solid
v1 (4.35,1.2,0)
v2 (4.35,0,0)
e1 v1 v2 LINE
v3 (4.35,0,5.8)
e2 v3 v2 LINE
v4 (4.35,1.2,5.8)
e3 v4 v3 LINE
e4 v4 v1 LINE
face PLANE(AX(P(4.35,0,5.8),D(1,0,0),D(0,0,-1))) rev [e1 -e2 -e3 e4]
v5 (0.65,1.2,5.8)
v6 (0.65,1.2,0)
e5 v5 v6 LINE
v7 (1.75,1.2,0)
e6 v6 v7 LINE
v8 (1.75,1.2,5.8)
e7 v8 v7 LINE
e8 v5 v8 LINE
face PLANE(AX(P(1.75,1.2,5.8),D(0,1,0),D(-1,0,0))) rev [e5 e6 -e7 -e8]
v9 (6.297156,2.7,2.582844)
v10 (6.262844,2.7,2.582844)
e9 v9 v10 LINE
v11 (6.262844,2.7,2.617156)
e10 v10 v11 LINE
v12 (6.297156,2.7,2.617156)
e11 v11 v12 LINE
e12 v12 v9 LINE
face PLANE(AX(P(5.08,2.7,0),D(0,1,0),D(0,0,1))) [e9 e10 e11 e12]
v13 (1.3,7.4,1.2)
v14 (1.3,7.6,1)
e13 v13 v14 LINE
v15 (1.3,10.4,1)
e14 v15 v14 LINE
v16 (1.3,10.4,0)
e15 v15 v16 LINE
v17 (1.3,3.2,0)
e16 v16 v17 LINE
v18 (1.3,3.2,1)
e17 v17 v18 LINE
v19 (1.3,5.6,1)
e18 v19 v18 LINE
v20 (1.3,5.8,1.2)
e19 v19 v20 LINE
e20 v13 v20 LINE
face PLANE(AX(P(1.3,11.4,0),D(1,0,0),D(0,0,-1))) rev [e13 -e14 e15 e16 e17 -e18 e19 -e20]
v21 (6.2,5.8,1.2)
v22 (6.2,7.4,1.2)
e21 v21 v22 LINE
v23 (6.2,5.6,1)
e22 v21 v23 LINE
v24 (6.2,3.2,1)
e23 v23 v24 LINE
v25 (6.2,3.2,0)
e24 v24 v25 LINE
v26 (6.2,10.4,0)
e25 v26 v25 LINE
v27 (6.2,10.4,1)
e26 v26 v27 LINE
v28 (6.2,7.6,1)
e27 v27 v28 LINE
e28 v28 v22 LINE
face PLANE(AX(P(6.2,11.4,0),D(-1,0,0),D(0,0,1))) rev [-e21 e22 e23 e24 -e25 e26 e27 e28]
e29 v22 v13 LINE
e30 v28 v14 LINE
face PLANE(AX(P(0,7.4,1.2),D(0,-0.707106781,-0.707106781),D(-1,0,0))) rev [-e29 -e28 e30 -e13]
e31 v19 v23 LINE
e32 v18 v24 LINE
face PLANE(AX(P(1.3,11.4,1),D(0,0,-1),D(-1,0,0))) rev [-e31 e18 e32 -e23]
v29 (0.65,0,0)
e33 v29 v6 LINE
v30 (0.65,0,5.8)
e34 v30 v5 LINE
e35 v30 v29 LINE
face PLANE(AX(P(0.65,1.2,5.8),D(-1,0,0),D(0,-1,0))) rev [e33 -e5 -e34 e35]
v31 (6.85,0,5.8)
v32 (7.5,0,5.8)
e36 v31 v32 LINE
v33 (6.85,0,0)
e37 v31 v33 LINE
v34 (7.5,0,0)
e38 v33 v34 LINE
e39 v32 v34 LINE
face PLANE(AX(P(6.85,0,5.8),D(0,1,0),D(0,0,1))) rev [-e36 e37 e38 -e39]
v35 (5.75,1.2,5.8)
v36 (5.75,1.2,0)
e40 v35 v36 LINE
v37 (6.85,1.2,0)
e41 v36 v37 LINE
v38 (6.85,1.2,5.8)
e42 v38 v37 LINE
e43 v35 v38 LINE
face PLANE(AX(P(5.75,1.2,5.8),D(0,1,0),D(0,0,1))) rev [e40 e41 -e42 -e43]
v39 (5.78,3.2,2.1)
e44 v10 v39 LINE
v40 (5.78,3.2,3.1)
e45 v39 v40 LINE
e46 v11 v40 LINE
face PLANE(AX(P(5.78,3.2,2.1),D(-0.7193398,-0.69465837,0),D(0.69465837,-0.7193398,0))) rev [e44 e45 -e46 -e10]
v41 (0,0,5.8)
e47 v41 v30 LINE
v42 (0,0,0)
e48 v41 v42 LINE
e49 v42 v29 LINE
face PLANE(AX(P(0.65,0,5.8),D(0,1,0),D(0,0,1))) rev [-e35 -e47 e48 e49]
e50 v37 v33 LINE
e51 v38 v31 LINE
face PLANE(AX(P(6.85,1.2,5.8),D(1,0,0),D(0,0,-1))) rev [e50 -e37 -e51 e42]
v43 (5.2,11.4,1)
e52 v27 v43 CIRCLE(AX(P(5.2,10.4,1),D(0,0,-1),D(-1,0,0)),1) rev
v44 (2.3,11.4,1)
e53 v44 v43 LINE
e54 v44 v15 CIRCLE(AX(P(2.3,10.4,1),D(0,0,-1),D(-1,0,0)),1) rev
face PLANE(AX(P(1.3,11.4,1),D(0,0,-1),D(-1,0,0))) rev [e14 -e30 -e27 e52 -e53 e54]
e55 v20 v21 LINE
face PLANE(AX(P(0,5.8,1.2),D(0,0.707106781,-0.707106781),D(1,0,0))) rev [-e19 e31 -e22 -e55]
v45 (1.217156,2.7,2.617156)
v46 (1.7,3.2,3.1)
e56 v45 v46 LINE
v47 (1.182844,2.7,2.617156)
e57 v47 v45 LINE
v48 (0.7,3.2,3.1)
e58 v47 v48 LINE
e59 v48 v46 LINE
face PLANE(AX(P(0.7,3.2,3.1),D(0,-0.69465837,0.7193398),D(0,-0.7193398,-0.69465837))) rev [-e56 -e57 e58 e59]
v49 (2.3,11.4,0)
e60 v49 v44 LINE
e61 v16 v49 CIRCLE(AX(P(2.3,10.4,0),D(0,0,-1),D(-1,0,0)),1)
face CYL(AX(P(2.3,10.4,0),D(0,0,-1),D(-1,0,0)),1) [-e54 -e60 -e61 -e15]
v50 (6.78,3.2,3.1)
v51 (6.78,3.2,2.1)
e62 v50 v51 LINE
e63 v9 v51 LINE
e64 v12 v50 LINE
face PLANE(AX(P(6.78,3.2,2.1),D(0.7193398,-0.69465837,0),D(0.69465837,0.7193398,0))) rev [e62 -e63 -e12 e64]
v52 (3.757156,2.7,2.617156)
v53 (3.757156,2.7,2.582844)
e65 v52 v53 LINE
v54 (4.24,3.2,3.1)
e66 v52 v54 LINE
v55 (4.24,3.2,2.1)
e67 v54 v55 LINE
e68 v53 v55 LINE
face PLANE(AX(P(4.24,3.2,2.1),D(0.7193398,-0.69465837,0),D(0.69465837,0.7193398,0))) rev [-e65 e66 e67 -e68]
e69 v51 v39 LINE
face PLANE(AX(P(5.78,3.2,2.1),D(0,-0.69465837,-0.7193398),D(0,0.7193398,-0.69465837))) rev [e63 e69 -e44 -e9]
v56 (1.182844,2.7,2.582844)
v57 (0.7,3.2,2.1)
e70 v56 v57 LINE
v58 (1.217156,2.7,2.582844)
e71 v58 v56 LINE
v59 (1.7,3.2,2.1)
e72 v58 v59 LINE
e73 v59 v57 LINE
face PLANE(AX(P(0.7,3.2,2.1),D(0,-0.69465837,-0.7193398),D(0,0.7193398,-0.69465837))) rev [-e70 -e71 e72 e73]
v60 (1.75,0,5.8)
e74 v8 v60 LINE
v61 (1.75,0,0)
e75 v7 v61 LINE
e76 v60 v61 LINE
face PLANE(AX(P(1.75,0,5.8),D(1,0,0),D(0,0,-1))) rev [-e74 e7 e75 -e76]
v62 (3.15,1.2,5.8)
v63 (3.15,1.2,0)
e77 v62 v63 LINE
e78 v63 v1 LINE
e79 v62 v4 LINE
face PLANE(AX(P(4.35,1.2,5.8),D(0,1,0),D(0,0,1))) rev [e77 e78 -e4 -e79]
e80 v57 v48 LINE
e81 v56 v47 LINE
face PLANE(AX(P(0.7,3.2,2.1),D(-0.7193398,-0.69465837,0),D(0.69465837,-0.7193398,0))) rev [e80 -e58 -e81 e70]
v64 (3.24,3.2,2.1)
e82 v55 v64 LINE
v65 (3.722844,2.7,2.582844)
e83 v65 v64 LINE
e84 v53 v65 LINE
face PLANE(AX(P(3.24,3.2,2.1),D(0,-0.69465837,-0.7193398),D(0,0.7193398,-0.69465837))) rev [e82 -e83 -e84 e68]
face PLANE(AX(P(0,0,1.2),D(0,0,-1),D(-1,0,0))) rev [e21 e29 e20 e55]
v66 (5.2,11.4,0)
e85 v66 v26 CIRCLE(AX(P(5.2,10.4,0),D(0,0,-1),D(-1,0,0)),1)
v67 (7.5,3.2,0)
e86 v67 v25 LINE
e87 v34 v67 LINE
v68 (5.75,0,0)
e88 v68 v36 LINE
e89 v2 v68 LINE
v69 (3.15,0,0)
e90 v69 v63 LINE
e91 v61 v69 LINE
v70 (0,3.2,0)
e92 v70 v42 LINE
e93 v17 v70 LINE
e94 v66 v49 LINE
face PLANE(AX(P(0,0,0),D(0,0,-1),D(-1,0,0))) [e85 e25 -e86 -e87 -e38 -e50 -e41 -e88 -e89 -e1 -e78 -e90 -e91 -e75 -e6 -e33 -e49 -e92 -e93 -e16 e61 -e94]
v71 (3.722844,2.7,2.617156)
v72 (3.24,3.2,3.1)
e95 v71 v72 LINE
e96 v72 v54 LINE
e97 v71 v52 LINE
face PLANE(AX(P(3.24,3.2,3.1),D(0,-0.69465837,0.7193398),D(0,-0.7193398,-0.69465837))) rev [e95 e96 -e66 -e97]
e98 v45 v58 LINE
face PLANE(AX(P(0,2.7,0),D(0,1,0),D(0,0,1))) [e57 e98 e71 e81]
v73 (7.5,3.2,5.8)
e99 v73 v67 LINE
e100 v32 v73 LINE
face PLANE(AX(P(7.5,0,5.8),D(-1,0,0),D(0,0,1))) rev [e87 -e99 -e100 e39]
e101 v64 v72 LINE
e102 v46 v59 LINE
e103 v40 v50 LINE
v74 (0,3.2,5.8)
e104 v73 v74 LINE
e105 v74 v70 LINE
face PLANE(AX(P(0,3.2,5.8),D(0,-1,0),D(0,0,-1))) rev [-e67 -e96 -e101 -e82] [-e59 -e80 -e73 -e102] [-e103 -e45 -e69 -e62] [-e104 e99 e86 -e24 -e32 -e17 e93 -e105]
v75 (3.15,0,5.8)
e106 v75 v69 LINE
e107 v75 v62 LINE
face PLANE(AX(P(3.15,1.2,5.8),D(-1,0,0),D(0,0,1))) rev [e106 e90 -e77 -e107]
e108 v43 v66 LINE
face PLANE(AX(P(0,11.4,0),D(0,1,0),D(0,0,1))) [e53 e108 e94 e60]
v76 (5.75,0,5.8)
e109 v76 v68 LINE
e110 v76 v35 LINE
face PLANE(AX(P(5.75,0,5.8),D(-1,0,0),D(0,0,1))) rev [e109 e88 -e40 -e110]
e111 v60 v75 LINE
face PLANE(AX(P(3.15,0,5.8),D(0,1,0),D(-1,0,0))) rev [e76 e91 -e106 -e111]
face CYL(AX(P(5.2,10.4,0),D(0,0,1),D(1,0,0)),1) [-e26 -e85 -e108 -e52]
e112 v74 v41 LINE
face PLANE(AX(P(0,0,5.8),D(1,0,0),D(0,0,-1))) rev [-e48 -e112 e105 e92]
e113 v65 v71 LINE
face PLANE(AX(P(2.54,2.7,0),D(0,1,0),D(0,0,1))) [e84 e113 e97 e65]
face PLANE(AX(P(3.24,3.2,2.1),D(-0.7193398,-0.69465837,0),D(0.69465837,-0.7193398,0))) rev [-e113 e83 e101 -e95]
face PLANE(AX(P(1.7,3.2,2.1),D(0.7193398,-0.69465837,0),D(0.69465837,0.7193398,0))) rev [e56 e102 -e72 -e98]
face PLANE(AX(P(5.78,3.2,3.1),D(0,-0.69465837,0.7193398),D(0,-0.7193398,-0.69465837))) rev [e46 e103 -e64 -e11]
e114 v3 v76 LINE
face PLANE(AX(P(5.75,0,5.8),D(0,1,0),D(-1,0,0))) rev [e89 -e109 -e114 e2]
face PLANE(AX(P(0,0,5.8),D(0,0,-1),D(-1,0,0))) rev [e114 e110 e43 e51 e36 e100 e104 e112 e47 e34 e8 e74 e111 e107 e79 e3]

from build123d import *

# Parameters (mm, degrees)
EXTRUDE_1_DEPTH                  = 5.8
SKETCH_2_W                       = 4.9
SKETCH_2_H                       = 1
EXTRUDE_2_DEPTH                  = 8.2
SKETCH_3_W                       = 4.9
SKETCH_3_H                       = 2
EXTRUDE_3_DEPTH                  = 0.2
CHAMFER_1_SIZE                   = 0.2
FILLET_1_R                       = 1
SKETCH_4_W                       = 1
SKETCH_4_H                       = 1
CUT_EXTRUDE_1_DEPTH              = 0.5
CUT_EXTRUDE_1_DRAFT              = -44
PATTERN_LINEAR_1_COPY_1_SKETCH_W = 1
PATTERN_LINEAR_1_COPY_1_SKETCH_H = 1
PATTERN_LINEAR_1_COPY_1_DEPTH    = 0.5
PATTERN_LINEAR_1_COPY_1_DRAFT    = -44
PATTERN_LINEAR_1_COPY_2_SKETCH_W = 1
PATTERN_LINEAR_1_COPY_2_SKETCH_H = 1
PATTERN_LINEAR_1_COPY_2_DEPTH    = 0.5
PATTERN_LINEAR_1_COPY_2_DRAFT    = -44


with BuildPart() as part:
    # Эскиз1 → Бобышка-Вытянуть1 (new body)
    with BuildSketch(Plane.XY):
        Polygon((0, 0), (0, 3.2), (7.5, 3.2), (7.5, 0), (6.85, 0), (6.85, 1.2), (5.75, 1.2), (5.75, 0), (4.35, 0), (4.35, 1.2), (3.15, 1.2), (3.15, 0), (1.75, 0), (1.75, 1.2), (0.65, 1.2), (0.65, 0), align=None)
    extrude(amount=EXTRUDE_1_DEPTH)

    # Эскиз2 → Бобышка-Вытянуть2 (add)
    with BuildSketch(Plane(origin=(0, 3.2, 0), x_dir=(1, 0, 0), z_dir=(0, 1, 0))):
        with Locations((3.75, -0.5)):
            Rectangle(SKETCH_2_W, SKETCH_2_H)
    extrude(amount=EXTRUDE_2_DEPTH)

    # Эскиз3 → Бобышка-Вытянуть3 (add)
    with BuildSketch(Plane.XY.offset(1)):
        with Locations((3.75, 6.6)):
            Rectangle(SKETCH_3_W, SKETCH_3_H)
    extrude(amount=EXTRUDE_3_DEPTH)

    # Фаска1
    chamfer_1_edges = [part.edges().sort_by_distance(p)[0] for p in [
        (3.75, 5.6, 1.2),
        (3.75, 7.6, 1.2),
    ]]
    chamfer(chamfer_1_edges, length=CHAMFER_1_SIZE - 0.0001)  # a hair under: the kernel refuses the full size

    # Скругление1
    fillet_1_edges = [part.edges().sort_by_distance(p)[0] for p in [
        (1.3, 11.4, 0.5),
        (6.2, 11.4, 0.5),
    ]]
    fillet(fillet_1_edges, radius=FILLET_1_R)


with BuildPart() as cut_extrude_1_tool:
    # Эскиз4 → Вырез-Вытянуть1 (with draft: the straight prism first)
    with BuildSketch(Plane(origin=(0, 3.2, 0), x_dir=(1, 0, 0), z_dir=(0, 1, 0))):
        with Locations((1.2, -2.6)):
            Rectangle(SKETCH_4_W, SKETCH_4_H)
    extrude(amount=-CUT_EXTRUDE_1_DEPTH)
    # Вырез-Вытянуть1: the draft: its side faces are tilted about the plane it starts from
    cut_extrude_1_sides = [cut_extrude_1_tool.faces().sort_by_distance(p)[0] for p in [
        (0.7, 2.95, 2.6),
        (1.2, 2.95, 3.1),
        (1.7, 2.95, 2.6),
        (1.2, 2.95, 2.1),
    ]]
    draft(cut_extrude_1_sides, Plane(origin=(0, 3.2, 0), x_dir=(1, 0, 0), z_dir=(0, 1, 0)), CUT_EXTRUDE_1_DRAFT)


with BuildPart() as part_1:
    add(part.part)

    # Вырез-Вытянуть1: cut by cut_extrude_1_tool
    add(cut_extrude_1_tool.part, mode=Mode.SUBTRACT)


with BuildPart() as pattern_linear_1_copy_1_tool:
    # Линейный массив1 copy 1 sketch → Линейный массив1 copy 1 (with draft: the straight prism first)
    with BuildSketch(Plane(origin=(2.54, 3.2, 0), x_dir=(1, 0, 0), z_dir=(0, 1, 0))):
        with Locations((1.2, -2.6)):
            Rectangle(PATTERN_LINEAR_1_COPY_1_SKETCH_W, PATTERN_LINEAR_1_COPY_1_SKETCH_H)
    extrude(amount=-PATTERN_LINEAR_1_COPY_1_DEPTH)
    # Линейный массив1 copy 1: the draft: its side faces are tilted about the plane it starts from
    pattern_linear_1_copy_1_sides = [pattern_linear_1_copy_1_tool.faces().sort_by_distance(p)[0] for p in [
        (3.24, 2.95, 2.6),
        (3.74, 2.95, 3.1),
        (4.24, 2.95, 2.6),
        (3.74, 2.95, 2.1),
    ]]
    draft(pattern_linear_1_copy_1_sides, Plane(origin=(2.54, 3.2, 0), x_dir=(1, 0, 0), z_dir=(0, 1, 0)), PATTERN_LINEAR_1_COPY_1_DRAFT)


with BuildPart() as part_2:
    add(part_1.part)

    # Линейный массив1 copy 1: cut by pattern_linear_1_copy_1_tool
    add(pattern_linear_1_copy_1_tool.part, mode=Mode.SUBTRACT)


with BuildPart() as pattern_linear_1_copy_2_tool:
    # Линейный массив1 copy 2 sketch → Линейный массив1 copy 2 (with draft: the straight prism first)
    with BuildSketch(Plane(origin=(5.08, 3.2, 0), x_dir=(1, 0, 0), z_dir=(0, 1, 0))):
        with Locations((1.2, -2.6)):
            Rectangle(PATTERN_LINEAR_1_COPY_2_SKETCH_W, PATTERN_LINEAR_1_COPY_2_SKETCH_H)
    extrude(amount=-PATTERN_LINEAR_1_COPY_2_DEPTH)
    # Линейный массив1 copy 2: the draft: its side faces are tilted about the plane it starts from
    pattern_linear_1_copy_2_sides = [pattern_linear_1_copy_2_tool.faces().sort_by_distance(p)[0] for p in [
        (5.78, 2.95, 2.6),
        (6.28, 2.95, 3.1),
        (6.78, 2.95, 2.6),
        (6.28, 2.95, 2.1),
    ]]
    draft(pattern_linear_1_copy_2_sides, Plane(origin=(5.08, 3.2, 0), x_dir=(1, 0, 0), z_dir=(0, 1, 0)), PATTERN_LINEAR_1_COPY_2_DRAFT)


with BuildPart() as part_3:
    add(part_2.part)

    # Линейный массив1 copy 2: cut by pattern_linear_1_copy_2_tool
    add(pattern_linear_1_copy_2_tool.part, mode=Mode.SUBTRACT)


solid = part_3.part
